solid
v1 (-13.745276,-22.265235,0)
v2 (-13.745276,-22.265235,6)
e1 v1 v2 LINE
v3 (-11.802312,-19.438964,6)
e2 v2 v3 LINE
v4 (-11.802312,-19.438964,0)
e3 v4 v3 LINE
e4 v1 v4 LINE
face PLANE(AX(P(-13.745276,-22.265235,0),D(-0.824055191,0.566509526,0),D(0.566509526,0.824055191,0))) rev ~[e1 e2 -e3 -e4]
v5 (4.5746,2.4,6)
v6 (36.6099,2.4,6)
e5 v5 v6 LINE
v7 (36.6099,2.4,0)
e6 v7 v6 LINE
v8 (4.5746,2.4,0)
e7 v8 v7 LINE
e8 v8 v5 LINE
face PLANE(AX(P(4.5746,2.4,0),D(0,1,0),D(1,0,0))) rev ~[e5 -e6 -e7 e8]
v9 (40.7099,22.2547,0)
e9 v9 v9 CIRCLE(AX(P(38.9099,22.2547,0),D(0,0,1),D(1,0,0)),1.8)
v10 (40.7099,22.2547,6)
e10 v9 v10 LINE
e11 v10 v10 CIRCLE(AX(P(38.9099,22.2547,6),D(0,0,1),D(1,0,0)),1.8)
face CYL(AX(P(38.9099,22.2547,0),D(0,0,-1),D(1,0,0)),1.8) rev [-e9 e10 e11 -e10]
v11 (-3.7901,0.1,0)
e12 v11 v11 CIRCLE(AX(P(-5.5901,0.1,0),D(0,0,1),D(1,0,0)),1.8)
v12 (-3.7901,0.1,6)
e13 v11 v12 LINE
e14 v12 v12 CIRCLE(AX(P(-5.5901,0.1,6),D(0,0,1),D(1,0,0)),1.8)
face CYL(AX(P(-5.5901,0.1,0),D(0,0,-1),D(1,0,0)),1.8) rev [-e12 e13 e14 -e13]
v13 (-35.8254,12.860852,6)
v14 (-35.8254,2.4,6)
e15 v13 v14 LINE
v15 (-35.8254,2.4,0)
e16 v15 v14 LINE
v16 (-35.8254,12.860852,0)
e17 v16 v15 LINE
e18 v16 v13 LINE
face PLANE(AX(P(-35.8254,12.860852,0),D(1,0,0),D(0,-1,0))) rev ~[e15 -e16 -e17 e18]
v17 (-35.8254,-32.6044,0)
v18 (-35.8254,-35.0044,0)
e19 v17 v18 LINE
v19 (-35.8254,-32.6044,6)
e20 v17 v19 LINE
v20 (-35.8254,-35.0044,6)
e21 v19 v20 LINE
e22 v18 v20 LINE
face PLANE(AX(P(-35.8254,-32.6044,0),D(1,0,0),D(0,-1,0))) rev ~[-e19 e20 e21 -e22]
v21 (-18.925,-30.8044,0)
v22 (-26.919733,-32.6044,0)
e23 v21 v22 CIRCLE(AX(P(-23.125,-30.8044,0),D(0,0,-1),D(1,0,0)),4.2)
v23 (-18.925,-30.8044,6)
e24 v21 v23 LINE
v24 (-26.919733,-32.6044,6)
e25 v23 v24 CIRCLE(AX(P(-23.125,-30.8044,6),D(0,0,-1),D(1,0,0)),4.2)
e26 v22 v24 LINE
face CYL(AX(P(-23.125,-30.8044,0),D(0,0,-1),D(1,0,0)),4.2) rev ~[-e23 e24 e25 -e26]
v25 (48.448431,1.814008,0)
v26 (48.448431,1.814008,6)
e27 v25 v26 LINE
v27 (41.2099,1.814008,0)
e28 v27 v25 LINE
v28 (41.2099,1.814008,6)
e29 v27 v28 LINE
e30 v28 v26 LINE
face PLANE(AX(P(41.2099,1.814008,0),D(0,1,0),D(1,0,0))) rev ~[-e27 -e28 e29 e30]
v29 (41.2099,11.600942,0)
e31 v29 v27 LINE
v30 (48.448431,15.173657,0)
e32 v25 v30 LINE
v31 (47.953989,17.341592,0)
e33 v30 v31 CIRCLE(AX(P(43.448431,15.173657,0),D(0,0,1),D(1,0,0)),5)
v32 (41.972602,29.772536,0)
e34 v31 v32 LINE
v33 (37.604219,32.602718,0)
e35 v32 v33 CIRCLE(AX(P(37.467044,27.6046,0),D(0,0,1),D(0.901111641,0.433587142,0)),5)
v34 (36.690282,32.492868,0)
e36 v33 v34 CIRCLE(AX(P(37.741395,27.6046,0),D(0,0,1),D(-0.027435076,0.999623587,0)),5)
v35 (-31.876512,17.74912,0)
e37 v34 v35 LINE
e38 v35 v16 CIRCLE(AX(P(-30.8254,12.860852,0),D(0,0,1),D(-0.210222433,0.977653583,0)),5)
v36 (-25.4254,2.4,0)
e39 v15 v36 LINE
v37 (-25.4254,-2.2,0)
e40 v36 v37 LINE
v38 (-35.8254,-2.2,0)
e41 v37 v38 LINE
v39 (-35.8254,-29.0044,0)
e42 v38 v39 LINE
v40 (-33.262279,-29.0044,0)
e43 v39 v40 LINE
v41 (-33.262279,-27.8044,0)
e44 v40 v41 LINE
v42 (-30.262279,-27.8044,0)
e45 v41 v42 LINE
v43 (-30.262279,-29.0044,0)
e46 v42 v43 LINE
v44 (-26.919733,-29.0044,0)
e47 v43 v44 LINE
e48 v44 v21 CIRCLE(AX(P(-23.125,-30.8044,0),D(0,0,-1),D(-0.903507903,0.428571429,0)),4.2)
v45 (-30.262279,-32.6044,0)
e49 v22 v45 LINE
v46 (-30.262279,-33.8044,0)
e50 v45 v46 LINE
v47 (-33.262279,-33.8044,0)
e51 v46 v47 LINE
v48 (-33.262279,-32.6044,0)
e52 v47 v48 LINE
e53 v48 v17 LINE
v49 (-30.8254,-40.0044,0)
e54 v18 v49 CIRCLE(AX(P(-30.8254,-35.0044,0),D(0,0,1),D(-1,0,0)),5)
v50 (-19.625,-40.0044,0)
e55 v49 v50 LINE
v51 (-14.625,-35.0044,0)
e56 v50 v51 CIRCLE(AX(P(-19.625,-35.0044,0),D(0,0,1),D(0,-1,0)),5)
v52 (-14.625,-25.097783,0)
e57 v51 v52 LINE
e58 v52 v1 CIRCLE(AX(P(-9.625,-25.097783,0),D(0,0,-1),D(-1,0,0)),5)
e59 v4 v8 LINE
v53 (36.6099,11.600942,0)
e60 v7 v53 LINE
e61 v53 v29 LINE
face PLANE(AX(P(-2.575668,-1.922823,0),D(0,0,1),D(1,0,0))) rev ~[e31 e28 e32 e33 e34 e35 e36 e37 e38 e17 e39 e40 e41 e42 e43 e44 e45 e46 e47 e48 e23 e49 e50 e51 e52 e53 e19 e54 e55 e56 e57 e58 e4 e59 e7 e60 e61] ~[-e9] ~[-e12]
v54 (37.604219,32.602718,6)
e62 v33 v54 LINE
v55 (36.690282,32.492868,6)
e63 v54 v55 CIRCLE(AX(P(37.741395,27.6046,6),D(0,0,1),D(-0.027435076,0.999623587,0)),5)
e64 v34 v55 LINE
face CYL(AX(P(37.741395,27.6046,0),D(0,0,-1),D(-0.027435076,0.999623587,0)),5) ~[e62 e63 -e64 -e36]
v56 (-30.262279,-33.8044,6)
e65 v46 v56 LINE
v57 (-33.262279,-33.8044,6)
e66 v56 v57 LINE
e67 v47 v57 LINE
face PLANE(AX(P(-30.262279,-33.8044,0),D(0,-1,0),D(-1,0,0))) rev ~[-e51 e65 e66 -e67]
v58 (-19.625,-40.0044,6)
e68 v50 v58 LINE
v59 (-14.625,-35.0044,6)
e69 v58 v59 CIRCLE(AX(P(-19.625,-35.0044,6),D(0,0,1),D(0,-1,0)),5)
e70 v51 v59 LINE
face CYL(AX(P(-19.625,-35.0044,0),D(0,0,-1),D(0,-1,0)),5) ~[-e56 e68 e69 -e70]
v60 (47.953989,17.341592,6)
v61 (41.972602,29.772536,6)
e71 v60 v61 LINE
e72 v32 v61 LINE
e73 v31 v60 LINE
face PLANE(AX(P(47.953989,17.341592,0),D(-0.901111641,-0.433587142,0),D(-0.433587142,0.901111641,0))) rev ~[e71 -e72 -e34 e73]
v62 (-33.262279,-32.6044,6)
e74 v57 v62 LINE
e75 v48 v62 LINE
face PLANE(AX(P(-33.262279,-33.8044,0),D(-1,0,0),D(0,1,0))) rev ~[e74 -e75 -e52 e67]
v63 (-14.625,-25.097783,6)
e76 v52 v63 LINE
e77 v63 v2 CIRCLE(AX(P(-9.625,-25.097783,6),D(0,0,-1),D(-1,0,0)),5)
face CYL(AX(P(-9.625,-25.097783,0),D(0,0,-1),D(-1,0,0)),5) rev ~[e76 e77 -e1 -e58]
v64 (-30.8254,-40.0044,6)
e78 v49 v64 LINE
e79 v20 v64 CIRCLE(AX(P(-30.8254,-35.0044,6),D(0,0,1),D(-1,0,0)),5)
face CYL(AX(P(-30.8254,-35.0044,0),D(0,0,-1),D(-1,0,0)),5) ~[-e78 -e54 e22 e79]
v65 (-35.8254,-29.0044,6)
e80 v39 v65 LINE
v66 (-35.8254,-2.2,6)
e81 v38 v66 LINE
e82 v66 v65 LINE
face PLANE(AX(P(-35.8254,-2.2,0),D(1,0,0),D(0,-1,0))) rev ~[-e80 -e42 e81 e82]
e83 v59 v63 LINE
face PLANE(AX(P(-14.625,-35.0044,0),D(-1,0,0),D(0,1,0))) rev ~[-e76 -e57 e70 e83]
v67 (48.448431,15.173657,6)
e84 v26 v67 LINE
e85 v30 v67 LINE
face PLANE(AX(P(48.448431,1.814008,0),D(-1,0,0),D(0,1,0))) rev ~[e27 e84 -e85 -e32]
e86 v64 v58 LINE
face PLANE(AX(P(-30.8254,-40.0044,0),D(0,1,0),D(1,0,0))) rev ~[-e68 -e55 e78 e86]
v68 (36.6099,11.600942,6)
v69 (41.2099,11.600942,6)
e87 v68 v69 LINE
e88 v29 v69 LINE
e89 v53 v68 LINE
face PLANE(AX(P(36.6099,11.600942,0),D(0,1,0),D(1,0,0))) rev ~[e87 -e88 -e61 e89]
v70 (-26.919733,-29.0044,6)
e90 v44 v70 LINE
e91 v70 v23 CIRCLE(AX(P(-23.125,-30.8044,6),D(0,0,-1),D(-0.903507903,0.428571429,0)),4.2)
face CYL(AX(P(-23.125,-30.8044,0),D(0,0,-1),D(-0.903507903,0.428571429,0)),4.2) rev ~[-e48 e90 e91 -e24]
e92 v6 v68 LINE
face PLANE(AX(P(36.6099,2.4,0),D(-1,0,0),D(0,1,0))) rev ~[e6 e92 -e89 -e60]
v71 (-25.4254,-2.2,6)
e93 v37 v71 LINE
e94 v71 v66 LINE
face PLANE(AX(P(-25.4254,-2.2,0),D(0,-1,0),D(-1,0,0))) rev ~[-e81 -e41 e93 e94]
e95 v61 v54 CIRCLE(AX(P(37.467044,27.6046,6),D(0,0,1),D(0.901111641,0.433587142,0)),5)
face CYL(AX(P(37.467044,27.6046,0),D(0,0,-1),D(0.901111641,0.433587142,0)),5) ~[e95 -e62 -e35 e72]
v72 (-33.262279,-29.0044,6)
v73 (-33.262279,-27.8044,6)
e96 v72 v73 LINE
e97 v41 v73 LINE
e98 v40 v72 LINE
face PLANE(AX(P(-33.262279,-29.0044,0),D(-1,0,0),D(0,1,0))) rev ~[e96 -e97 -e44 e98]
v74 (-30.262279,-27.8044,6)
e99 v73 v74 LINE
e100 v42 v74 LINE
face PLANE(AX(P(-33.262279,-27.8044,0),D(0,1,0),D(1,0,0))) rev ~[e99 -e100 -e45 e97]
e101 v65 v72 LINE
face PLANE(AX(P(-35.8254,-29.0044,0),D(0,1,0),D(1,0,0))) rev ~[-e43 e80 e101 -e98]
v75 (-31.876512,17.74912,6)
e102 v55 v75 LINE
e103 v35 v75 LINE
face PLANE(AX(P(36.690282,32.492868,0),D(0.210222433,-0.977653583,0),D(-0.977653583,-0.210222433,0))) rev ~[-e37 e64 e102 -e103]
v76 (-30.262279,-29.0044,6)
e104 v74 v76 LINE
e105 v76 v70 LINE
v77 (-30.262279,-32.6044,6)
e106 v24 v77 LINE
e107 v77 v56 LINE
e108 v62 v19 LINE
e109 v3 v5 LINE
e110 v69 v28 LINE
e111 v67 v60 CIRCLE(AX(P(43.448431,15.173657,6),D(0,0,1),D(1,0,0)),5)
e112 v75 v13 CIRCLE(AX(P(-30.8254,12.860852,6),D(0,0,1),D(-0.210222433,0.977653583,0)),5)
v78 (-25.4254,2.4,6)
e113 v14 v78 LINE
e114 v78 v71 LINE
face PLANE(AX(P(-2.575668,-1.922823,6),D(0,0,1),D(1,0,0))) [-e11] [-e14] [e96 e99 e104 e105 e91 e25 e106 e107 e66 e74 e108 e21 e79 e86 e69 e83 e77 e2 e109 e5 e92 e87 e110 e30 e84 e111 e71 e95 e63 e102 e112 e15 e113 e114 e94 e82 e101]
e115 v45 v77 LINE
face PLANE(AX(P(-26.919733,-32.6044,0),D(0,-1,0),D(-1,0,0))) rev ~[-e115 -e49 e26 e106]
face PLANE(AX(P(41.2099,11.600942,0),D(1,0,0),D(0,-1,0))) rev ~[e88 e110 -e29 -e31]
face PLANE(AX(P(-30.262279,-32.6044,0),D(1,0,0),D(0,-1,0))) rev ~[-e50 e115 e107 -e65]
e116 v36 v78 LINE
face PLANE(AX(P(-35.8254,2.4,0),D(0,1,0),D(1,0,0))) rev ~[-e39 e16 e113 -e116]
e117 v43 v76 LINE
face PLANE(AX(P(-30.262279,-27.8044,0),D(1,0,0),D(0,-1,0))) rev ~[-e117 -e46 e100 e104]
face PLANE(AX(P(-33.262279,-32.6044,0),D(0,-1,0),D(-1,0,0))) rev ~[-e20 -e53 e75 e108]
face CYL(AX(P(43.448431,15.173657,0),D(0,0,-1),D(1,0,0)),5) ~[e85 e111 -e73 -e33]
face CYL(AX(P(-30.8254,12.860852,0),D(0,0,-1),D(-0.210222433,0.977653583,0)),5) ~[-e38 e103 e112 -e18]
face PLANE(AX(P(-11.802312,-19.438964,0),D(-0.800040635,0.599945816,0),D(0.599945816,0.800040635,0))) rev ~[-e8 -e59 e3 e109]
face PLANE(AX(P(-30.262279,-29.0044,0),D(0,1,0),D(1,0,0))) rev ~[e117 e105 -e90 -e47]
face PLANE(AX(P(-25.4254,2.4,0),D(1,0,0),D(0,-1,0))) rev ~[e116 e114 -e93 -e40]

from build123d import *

# Parameters (mm, degrees)
F0_R     = 1.8
F1_DEPTH = 6


# Not quite as in the source:
# - a feature names something its author has since deleted; it is built from what else it names


with BuildPart() as f1:
    # F0 (on Top) → F1 (new body)
    with BuildSketch(Plane.XY):
        with BuildLine():
            ThreePointArc((-26.9197331922, -29.0044), (-22.202470707, -26.7069691338), (-18.925, -30.8044))
            ThreePointArc((-18.925, -30.8044), (-22.202470707, -34.9018308662), (-26.9197331922, -32.6044))
            Line((-26.9197331922, -32.6044), (-30.2622788846, -32.6044))
            Line((-30.2622788846, -32.6044), (-30.2622788846, -33.8044))
            Line((-30.2622788846, -33.8044), (-33.2622788846, -33.8044))
            Line((-33.2622788846, -33.8044), (-33.2622788846, -32.6044))
            Line((-33.2622788846, -32.6044), (-35.8254, -32.6044))
            Line((-35.8254, -32.6044), (-35.8254, -35.0044))
            ThreePointArc((-35.8254, -35.0044), (-34.3609339059, -38.5399339059), (-30.8254, -40.0044))
            Line((-30.8254, -40.0044), (-19.625, -40.0044))
            ThreePointArc((-19.625, -40.0044), (-16.0894660941, -38.5399339059), (-14.625, -35.0044))
            Line((-14.625, -35.0044), (-14.625, -25.0977827265))
            ThreePointArc((-14.625, -25.0977827265), (-14.400006794, -23.6147756066), (-13.7452759529, -22.2652350973))
            Line((-13.7452759529, -22.2652350973), (-11.8023123147, -19.4389644026))
            Line((-11.8023123147, -19.4389644026), (4.5746, 2.4))
            Line((4.5746, 2.4), (36.6099, 2.4))
            Line((36.6099, 2.4), (36.6099, 11.6009423509))
            Line((36.6099, 11.6009423509), (37.1099, 11.6009423509))
            Line((37.1099, 11.6009423509), (38.9099, 11.6009423509))
            Line((38.9099, 11.6009423509), (40.7099, 11.6009423509))
            Line((40.7099, 11.6009423509), (41.2099, 11.6009423509))
            Line((41.2099, 11.6009423509), (41.2099, 1.8140082314))
            Line((41.2099, 1.8140082314), (48.4484305441, 1.8140082314))
            Line((48.4484305441, 1.8140082314), (48.4484305441, 15.1736566274))
            ThreePointArc((48.4484305441, 15.1736566274), (48.3232531582, 16.2854589848), (47.9539887514, 17.341592337))
            Line((47.9539887514, 17.341592337), (41.9726020282, 29.7725357096))
            ThreePointArc((41.9726020282, 29.7725357096), (40.1857248711, 31.8008808947), (37.6042192016, 32.6027179373))
            ThreePointArc((37.6042192016, 32.6027179373), (37.1447174672, 32.5688699786), (36.6902824172, 32.4928679158))
            Line((36.6902824172, 32.4928679158), (-31.8765121651, 17.7491195886))
            ThreePointArc((-31.8765121651, 17.7491195886), (-34.7148447435, 16.0028605187), (-35.8254, 12.8608516729))
            Line((-35.8254, 12.8608516729), (-35.8254, 2.4))
            Line((-35.8254, 2.4), (-25.4254, 2.4))
            Line((-25.4254, 2.4), (-25.4254, 1.9))
            Line((-25.4254, 1.9), (-25.4254, -1.7))
            Line((-25.4254, -1.7), (-25.4254, -2.2))
            Line((-25.4254, -2.2), (-35.8254, -2.2))
            Line((-35.8254, -2.2), (-35.8254, -29.0044))
            Line((-35.8254, -29.0044), (-33.2622788846, -29.0044))
            Line((-33.2622788846, -29.0044), (-33.2622788846, -27.8044))
            Line((-33.2622788846, -27.8044), (-30.2622788846, -27.8044))
            Line((-30.2622788846, -27.8044), (-30.2622788846, -29.0044))
            Line((-30.2622788846, -29.0044), (-26.9197331922, -29.0044))
        make_face()
        with Locations((-5.5901, 0.1)):
            Circle(F0_R, mode=Mode.SUBTRACT)
        with Locations((38.9099, 22.2547)):
            Circle(F0_R, mode=Mode.SUBTRACT)
    extrude(amount=F1_DEPTH)


solid = f1.part
